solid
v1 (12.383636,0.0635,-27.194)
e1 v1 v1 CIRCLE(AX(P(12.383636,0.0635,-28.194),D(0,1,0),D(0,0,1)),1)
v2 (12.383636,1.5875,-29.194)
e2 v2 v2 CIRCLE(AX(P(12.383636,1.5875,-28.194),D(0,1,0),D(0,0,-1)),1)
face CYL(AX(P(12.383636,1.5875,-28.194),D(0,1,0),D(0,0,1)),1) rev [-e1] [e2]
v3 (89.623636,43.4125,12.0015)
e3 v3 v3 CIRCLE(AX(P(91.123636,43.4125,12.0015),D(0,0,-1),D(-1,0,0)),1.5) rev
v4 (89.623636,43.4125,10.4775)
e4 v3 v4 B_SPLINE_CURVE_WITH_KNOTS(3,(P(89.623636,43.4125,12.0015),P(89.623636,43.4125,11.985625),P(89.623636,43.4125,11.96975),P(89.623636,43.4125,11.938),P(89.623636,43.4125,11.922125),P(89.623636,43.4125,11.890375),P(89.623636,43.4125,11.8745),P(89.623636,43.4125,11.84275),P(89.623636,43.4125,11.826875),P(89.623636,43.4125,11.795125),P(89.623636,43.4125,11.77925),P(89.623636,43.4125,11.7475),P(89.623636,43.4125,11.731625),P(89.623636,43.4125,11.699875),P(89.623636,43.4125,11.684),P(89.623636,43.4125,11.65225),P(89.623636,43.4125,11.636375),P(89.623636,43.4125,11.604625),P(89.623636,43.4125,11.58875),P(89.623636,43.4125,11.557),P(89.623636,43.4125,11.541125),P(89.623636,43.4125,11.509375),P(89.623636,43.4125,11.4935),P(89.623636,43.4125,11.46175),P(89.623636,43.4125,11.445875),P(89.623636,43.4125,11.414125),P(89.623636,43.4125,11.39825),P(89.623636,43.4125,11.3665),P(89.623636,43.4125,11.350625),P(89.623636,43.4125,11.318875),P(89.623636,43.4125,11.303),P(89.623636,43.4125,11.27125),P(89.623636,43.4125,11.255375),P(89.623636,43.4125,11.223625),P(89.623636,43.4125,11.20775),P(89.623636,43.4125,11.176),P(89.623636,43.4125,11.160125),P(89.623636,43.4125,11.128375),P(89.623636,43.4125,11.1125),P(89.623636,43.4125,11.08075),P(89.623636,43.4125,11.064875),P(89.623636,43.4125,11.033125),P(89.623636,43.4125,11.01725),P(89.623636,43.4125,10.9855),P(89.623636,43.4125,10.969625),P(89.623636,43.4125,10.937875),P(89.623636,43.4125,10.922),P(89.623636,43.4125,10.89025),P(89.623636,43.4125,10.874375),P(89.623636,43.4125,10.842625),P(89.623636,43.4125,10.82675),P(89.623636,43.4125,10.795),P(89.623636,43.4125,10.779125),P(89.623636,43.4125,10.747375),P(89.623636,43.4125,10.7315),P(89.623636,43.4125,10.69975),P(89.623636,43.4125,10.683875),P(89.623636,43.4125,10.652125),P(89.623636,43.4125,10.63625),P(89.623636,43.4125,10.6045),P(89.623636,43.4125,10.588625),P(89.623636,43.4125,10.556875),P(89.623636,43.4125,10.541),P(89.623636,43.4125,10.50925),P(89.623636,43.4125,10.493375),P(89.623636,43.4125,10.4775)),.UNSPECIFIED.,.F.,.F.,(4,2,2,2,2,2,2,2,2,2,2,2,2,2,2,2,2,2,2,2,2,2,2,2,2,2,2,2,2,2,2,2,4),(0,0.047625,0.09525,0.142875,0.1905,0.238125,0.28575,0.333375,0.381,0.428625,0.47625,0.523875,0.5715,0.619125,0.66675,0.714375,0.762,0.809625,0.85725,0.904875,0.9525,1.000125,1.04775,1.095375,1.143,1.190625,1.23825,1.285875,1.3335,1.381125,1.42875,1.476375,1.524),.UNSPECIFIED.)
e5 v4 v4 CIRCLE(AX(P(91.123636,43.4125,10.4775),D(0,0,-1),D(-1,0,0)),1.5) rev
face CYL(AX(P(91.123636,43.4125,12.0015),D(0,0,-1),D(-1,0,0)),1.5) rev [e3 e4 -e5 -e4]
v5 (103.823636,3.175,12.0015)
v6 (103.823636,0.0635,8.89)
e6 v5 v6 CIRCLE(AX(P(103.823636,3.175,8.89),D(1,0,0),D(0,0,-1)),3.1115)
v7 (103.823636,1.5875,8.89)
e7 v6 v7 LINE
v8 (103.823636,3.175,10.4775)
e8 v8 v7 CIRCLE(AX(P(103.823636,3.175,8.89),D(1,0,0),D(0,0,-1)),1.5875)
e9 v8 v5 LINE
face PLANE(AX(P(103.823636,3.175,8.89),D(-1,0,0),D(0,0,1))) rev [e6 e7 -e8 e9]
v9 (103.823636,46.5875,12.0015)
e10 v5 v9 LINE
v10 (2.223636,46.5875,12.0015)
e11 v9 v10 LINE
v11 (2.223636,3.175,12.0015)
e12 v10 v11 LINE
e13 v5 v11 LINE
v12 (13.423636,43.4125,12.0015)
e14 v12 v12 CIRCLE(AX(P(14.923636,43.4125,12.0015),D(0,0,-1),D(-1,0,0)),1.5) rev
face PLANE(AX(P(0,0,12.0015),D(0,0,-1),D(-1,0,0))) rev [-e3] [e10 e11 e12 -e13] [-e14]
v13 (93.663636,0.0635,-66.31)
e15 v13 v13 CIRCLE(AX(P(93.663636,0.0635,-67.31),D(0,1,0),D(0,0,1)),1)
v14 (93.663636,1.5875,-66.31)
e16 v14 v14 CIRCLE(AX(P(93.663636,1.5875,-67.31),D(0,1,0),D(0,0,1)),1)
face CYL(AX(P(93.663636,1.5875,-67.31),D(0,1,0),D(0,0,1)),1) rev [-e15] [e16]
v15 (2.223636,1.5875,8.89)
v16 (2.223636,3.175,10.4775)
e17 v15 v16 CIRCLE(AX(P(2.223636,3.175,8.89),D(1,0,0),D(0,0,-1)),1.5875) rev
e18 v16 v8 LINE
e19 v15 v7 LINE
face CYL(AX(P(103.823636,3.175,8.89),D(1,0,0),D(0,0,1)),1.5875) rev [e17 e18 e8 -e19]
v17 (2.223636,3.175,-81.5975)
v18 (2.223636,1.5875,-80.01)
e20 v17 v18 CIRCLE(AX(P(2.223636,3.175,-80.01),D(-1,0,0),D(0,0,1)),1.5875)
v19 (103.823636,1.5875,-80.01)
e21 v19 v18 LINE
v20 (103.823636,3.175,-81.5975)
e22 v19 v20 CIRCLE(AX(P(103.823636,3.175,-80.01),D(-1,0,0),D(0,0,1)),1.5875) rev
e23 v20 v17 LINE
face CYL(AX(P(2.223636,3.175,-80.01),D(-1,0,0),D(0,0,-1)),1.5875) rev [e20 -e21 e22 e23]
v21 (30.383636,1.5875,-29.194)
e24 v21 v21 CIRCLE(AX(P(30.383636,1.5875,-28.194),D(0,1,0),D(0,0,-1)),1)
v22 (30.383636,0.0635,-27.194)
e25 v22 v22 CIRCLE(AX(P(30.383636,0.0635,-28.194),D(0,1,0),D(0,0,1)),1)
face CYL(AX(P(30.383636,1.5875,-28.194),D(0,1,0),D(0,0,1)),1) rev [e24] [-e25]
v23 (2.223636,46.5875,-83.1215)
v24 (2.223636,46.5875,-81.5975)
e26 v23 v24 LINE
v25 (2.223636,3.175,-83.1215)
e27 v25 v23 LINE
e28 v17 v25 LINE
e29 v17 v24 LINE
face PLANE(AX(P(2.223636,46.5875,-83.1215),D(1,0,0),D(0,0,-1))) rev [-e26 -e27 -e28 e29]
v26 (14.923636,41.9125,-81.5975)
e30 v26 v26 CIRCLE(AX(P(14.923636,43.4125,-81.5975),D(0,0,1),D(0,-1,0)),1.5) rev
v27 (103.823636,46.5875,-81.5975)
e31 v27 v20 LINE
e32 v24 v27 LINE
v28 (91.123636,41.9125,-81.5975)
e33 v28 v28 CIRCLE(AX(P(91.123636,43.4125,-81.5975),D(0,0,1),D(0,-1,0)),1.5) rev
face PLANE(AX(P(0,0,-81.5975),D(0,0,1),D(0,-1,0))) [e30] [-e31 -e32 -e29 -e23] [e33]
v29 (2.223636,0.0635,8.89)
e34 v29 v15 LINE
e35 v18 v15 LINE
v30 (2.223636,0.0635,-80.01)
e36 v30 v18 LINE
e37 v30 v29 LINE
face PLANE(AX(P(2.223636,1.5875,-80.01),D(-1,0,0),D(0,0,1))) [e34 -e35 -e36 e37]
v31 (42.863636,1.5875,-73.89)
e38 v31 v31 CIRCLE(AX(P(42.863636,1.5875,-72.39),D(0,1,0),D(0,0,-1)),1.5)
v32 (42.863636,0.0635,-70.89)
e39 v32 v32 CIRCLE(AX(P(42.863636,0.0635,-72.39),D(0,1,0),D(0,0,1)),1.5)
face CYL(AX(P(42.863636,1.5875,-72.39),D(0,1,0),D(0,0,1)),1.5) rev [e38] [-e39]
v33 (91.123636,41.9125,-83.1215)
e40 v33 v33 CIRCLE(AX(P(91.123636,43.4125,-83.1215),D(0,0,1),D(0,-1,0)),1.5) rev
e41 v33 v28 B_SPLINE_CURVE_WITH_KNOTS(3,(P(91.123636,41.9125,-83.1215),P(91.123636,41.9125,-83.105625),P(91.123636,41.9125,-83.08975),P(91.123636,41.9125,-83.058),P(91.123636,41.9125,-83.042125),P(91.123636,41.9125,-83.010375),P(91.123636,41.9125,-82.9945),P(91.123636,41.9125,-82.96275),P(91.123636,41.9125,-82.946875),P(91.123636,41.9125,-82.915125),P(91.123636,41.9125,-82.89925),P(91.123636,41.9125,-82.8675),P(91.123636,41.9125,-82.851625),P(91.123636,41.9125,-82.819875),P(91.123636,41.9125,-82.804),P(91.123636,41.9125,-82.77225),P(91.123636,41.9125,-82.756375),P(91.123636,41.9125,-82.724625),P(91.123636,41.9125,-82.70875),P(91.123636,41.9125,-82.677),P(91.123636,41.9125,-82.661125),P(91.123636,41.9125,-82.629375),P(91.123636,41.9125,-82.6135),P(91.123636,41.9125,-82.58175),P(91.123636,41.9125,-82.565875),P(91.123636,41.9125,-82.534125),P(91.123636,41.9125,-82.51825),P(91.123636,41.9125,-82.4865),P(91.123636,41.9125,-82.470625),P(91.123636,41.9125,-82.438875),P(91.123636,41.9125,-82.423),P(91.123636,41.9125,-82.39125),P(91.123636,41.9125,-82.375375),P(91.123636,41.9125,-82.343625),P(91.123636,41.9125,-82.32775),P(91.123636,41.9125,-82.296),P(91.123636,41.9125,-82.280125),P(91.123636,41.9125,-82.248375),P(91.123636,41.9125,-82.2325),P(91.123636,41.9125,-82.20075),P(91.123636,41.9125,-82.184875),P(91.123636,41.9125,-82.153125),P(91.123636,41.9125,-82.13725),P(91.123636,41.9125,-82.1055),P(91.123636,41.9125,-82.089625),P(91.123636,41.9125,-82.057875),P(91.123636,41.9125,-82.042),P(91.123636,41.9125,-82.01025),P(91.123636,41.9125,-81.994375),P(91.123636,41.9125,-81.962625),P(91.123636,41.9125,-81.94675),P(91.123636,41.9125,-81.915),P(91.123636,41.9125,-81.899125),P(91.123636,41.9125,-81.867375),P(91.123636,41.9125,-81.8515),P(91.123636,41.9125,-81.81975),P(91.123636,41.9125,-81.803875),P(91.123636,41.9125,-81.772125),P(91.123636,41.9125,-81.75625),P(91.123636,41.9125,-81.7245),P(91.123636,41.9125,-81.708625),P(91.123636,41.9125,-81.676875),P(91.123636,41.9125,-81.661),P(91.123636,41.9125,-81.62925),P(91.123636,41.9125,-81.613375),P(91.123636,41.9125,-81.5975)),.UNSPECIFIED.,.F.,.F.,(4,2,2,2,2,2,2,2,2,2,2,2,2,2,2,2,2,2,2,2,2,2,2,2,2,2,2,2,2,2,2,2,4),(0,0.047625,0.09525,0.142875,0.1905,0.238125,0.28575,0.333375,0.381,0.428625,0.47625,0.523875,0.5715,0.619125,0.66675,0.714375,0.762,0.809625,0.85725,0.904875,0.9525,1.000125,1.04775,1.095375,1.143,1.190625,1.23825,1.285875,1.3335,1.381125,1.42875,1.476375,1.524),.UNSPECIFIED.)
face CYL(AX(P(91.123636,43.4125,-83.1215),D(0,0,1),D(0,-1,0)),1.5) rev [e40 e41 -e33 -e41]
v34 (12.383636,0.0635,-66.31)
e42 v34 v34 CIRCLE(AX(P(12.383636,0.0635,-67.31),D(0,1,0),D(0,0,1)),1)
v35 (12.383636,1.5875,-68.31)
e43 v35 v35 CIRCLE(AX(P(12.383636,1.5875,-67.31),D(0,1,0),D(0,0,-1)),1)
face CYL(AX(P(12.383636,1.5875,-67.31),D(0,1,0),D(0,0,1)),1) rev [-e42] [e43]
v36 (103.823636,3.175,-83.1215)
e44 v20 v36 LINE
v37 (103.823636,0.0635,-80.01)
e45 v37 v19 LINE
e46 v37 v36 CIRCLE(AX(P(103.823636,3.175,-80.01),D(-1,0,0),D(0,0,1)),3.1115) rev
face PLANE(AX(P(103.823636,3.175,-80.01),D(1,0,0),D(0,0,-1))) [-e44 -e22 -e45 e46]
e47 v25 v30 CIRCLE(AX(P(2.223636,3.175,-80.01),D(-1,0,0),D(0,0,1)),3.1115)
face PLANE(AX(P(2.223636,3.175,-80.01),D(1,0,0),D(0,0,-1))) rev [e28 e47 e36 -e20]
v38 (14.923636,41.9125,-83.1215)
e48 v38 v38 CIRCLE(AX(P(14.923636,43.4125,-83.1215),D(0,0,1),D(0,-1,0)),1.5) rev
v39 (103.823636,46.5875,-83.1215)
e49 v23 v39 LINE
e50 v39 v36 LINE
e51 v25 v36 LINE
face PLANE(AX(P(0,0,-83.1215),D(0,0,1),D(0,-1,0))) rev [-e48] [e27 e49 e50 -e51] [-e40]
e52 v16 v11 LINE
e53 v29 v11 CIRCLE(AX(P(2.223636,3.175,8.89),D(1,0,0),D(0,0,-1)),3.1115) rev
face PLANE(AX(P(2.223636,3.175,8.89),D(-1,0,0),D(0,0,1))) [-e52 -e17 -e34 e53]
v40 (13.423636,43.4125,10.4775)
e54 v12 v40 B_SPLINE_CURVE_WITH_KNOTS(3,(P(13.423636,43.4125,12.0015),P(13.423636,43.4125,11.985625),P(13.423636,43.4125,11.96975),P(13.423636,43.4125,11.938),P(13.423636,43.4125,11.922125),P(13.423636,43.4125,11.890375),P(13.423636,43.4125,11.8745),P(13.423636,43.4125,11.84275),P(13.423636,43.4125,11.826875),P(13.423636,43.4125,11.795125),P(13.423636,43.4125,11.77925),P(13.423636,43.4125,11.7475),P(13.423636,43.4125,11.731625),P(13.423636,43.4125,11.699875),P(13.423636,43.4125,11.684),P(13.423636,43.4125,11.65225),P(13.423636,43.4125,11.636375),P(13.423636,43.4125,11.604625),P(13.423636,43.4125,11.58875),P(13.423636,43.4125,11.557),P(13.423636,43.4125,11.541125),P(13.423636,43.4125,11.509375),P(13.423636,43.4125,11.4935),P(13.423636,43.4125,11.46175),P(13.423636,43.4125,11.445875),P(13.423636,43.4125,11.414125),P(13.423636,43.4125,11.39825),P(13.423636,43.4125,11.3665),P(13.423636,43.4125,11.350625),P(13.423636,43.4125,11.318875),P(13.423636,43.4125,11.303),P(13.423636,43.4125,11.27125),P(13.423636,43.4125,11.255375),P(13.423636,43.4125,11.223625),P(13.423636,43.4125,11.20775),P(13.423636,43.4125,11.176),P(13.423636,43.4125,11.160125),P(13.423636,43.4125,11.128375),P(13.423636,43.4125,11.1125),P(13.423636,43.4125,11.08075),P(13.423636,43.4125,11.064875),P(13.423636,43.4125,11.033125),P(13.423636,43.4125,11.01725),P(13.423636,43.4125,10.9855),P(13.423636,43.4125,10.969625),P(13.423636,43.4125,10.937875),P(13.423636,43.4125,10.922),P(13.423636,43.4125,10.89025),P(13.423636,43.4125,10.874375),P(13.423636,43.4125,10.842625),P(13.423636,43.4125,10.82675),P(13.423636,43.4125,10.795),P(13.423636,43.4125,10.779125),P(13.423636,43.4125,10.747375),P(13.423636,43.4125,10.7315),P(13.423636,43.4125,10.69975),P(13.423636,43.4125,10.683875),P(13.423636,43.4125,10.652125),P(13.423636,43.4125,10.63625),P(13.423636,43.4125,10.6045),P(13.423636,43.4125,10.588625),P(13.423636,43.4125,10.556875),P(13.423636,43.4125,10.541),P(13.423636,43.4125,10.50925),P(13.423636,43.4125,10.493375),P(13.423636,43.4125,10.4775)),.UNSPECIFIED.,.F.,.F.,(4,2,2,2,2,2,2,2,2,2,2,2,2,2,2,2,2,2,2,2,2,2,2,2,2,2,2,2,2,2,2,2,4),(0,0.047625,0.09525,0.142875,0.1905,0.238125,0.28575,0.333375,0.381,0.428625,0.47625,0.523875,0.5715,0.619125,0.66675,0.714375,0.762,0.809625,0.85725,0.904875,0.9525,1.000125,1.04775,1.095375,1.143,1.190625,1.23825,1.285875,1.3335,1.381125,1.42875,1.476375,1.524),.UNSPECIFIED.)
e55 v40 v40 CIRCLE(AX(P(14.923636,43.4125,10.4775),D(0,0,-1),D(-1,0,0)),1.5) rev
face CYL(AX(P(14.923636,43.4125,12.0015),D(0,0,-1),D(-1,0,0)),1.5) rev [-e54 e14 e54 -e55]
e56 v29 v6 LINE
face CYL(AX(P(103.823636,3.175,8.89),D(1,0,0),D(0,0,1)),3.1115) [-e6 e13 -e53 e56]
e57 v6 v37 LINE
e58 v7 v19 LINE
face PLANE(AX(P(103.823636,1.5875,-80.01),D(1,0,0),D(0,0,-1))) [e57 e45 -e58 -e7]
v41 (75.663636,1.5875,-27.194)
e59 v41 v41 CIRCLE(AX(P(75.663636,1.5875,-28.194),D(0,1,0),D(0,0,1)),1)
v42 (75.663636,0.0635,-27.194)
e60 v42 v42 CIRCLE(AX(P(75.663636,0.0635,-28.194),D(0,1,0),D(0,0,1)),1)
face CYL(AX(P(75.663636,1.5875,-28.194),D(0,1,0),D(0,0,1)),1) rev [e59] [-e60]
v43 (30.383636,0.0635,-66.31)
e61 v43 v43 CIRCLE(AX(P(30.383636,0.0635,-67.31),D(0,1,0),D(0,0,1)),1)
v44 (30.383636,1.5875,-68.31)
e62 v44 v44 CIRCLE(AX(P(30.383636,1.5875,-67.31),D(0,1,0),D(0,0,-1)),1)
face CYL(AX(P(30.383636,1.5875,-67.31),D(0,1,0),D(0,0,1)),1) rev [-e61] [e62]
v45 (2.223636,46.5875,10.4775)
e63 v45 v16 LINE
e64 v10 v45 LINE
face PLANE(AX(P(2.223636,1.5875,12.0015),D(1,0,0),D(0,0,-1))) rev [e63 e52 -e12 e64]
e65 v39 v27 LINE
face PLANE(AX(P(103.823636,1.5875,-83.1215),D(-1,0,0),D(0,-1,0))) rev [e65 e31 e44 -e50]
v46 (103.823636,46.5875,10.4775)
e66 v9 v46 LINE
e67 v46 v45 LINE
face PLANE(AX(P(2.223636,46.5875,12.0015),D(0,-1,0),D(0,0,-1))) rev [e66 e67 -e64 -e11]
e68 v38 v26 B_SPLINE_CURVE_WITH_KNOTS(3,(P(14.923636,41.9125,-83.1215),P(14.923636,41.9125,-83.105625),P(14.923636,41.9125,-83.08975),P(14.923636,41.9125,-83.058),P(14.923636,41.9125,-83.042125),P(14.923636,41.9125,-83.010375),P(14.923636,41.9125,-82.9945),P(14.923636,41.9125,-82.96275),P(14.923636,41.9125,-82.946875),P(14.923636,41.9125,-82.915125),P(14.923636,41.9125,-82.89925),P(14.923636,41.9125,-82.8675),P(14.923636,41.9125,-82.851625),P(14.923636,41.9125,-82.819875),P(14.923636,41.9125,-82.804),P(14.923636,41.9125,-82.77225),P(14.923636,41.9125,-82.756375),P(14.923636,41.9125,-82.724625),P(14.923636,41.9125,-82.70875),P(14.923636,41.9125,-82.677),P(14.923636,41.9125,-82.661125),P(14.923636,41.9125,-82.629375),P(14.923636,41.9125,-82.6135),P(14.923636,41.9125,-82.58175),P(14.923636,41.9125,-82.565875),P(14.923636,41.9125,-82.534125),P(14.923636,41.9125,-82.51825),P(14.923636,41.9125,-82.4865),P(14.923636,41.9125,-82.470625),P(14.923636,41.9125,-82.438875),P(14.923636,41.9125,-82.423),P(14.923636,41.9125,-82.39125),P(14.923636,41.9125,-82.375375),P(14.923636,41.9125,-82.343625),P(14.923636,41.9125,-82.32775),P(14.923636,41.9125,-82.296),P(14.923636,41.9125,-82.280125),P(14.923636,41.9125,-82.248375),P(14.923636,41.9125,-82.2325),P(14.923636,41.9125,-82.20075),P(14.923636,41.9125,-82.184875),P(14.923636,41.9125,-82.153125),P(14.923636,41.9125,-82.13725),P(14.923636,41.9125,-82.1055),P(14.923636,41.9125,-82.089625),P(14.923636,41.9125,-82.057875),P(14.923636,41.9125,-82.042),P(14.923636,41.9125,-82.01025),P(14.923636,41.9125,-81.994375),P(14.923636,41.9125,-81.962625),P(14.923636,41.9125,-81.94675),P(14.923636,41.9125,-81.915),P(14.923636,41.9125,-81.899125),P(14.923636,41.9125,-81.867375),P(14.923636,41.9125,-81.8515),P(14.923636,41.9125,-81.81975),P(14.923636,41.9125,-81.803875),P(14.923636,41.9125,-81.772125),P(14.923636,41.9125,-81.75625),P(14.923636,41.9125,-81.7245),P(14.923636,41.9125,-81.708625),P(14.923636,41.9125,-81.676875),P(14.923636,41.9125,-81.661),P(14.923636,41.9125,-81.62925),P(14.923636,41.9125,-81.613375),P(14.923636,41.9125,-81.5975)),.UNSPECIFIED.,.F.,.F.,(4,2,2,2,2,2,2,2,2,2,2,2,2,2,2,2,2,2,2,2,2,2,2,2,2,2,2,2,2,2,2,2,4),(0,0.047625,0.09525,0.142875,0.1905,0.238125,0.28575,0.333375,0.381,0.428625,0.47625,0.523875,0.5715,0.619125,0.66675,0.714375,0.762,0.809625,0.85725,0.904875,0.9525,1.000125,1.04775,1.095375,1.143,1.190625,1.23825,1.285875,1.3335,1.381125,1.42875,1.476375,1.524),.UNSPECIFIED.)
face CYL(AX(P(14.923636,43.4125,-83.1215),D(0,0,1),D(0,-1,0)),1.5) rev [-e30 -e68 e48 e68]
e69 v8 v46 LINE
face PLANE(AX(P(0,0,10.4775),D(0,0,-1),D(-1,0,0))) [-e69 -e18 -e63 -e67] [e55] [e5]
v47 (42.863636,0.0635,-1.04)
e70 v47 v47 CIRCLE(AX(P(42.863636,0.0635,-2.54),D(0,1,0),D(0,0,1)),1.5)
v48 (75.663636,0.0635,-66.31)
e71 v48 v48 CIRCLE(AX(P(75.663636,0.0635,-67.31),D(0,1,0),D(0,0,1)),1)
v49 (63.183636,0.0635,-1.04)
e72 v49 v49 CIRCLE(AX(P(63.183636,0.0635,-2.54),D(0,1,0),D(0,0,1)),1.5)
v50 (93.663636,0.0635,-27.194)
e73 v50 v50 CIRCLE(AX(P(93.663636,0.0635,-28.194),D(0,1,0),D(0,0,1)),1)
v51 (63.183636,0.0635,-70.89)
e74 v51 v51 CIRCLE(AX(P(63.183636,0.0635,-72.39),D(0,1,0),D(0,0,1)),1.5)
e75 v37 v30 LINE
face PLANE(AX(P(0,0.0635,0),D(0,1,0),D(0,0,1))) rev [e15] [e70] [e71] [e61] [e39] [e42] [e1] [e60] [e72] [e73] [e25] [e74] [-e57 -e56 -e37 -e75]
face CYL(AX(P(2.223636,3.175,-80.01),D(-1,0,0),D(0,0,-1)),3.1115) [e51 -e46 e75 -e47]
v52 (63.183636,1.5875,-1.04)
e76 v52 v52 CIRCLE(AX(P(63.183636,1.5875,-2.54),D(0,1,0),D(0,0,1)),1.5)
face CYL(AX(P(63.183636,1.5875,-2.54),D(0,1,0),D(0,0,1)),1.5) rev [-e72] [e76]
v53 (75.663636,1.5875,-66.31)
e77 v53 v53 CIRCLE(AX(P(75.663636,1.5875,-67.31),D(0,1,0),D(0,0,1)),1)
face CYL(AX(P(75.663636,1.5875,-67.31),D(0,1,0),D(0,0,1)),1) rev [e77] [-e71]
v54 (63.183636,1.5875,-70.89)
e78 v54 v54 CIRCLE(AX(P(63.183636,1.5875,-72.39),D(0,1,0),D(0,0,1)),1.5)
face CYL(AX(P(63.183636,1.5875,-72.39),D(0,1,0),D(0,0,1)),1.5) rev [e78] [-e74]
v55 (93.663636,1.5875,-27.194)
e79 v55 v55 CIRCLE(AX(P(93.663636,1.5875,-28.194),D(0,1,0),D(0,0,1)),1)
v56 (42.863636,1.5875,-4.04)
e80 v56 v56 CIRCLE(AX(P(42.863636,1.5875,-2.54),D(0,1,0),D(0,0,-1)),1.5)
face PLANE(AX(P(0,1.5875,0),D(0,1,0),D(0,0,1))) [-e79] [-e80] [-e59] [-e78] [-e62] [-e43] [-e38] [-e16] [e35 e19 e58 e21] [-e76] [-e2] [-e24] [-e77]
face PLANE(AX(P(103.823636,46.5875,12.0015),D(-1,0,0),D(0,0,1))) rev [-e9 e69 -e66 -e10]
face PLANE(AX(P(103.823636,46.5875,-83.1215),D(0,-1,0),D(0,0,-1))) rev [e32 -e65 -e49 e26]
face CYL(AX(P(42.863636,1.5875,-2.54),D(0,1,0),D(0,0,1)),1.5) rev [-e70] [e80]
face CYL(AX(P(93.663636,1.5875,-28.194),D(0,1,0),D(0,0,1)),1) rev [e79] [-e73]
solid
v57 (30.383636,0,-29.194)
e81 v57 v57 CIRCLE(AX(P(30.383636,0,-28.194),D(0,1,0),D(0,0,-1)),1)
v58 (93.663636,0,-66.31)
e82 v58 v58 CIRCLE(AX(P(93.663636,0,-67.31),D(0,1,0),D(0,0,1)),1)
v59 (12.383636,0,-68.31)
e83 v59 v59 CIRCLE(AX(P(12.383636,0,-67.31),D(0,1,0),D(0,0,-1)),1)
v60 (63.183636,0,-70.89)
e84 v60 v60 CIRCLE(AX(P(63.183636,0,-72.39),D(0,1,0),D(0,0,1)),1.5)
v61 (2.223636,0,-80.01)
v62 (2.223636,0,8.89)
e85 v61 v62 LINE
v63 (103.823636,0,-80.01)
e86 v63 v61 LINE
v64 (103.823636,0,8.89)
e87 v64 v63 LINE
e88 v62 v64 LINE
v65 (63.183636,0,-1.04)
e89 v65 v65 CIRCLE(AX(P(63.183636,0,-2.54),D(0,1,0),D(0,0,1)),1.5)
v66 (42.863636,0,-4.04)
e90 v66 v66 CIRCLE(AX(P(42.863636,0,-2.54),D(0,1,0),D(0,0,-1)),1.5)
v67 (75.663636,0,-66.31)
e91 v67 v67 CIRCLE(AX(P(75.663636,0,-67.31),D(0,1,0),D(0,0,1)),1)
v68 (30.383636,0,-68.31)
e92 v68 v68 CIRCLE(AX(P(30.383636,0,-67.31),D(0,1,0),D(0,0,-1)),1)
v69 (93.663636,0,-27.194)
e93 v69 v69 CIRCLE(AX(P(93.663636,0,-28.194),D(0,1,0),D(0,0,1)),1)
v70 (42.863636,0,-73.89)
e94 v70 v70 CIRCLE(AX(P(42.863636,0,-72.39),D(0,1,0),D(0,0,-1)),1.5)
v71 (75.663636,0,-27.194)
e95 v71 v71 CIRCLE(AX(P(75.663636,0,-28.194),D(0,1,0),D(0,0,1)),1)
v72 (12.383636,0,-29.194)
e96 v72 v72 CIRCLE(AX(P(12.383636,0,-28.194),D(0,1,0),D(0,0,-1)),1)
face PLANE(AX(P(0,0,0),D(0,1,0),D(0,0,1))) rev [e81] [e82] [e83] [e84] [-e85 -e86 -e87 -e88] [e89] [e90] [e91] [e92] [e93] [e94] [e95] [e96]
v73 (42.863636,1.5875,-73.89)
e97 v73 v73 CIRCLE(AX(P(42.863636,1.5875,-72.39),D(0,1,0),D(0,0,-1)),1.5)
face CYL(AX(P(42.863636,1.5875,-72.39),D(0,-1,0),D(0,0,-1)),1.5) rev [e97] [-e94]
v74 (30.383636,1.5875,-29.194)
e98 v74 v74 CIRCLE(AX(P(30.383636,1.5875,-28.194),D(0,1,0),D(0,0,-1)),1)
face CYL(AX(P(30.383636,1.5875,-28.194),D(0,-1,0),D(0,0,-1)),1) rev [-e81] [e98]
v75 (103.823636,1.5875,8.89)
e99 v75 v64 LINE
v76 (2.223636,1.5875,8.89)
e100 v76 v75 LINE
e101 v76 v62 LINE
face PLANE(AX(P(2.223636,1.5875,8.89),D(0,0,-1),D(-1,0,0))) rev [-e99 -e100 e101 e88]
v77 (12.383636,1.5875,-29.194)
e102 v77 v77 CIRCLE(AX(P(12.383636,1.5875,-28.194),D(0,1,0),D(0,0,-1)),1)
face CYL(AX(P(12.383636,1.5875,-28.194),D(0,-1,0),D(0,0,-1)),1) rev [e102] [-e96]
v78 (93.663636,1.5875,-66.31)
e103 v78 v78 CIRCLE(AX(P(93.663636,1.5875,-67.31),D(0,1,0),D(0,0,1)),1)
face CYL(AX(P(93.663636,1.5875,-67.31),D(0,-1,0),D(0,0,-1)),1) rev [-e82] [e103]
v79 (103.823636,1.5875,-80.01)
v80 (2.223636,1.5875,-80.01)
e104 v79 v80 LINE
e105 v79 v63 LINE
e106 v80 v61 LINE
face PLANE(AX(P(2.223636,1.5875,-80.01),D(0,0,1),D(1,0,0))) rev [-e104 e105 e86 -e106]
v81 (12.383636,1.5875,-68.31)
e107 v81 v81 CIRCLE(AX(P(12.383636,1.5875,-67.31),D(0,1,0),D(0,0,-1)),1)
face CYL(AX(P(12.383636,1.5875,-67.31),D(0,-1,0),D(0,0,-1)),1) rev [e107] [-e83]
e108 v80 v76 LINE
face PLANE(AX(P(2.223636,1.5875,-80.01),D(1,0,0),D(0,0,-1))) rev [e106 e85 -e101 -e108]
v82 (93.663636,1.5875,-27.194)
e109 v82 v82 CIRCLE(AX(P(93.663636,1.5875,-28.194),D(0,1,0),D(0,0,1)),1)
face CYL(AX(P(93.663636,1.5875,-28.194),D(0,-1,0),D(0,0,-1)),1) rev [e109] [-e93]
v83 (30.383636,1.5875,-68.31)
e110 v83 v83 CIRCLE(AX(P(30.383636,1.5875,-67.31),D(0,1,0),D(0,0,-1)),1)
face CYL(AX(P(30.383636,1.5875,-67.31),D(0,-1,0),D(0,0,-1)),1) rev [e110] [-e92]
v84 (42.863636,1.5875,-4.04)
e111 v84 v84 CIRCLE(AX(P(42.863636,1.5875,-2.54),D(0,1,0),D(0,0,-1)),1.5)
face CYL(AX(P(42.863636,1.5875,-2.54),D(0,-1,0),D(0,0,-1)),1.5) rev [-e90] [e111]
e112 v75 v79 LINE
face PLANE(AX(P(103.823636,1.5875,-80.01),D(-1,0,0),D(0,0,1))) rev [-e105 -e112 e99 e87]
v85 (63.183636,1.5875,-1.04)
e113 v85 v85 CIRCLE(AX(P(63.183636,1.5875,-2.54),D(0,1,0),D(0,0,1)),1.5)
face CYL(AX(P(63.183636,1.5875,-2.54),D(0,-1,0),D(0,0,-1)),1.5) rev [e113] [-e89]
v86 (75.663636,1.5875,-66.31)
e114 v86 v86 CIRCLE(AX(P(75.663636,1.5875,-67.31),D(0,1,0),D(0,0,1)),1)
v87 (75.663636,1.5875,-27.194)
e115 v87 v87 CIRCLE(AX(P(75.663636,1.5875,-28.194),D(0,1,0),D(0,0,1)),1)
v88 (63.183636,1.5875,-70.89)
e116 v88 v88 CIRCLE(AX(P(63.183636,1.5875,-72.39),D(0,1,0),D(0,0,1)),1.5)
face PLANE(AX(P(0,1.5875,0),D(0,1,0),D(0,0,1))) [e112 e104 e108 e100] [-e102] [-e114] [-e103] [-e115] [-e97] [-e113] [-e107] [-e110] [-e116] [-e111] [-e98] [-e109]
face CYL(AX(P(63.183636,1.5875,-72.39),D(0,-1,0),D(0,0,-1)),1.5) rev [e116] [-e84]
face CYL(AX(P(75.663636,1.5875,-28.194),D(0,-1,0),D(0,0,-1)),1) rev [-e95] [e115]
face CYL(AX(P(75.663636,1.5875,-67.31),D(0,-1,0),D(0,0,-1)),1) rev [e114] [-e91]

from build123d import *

# Parameters (mm, degrees)
ESQUISSE1_W                      = 101.6
ESQUISSE1_H                      = 88.9
ESQUISSE1_R                      = 1.5
ESQUISSE1_R_2                    = 1
BOSS_EXTRU_1_DEPTH               = 1.5875
CONVERTIR_VOLUME1_START          = 0.0635
CONVERTIR_VOLUME1_OUTLINE_W      = 101.6
CONVERTIR_VOLUME1_OUTLINE_H      = 88.9
CONVERTIR_VOLUME1_OUTLINE_R      = 1.5
CONVERTIR_VOLUME1_OUTLINE_R_2    = 1
CONVERTIR_VOLUME1_DEPTH          = 1.524
T_LE_PLI_E_SUR_AR_TE1_DEPTH      = 101.6
T_LE_START                       = 1.524
T_LE_PLI_E_SUR_AR_TE1_PROFILE_W  = 101.6
T_LE_PLI_E_SUR_AR_TE1_PROFILE_H  = 43.4125
T_LE_PLI_E_SUR_AR_TE1_PROFILE_R  = 1.5
T_LE_PLI_E_SUR_AR_TE1_FLAT_DEPTH = 1.524
T_LE_PLI_E_SUR_AR_TE2_DEPTH      = 101.6
T_LE_PLI_E_SUR_AR_TE2_PROFILE_W  = 101.6
T_LE_PLI_E_SUR_AR_TE2_PROFILE_H  = 43.4125
T_LE_PLI_E_SUR_AR_TE2_PROFILE_R  = 1.5
T_LE_PLI_E_SUR_AR_TE2_FLAT_DEPTH = 1.524


# Read off the part's stored shape, not the designer's step: Convertir-Volume1
# Sheet-metal steps are written as plain solids
with BuildPart() as part:
    # Esquisse1 → Boss.-Extru.1 (new body)
    with BuildSketch(Plane(origin=(0, 0, 0), x_dir=(1, 0, 0), z_dir=(0, 1, 0))):
        with Locations((53.023636364, 35.56)):
            Rectangle(ESQUISSE1_W, ESQUISSE1_H)
        with Locations(Location((63.183636364, 72.39, 0), (0, 0, 270))):
            Circle(ESQUISSE1_R, mode=Mode.SUBTRACT)
        with Locations(Location((63.183636364, 2.54, 0), (0, 0, 270))):
            Circle(ESQUISSE1_R, mode=Mode.SUBTRACT)
        with Locations(Location((75.663636364, 67.31, 0), (0, 0, 270))):
            Circle(ESQUISSE1_R_2, mode=Mode.SUBTRACT)
        with Locations(Location((93.663636364, 67.31, 0), (0, 0, 270))):
            Circle(ESQUISSE1_R_2, mode=Mode.SUBTRACT)
        with Locations(Location((93.663636364, 28.194, 0), (0, 0, 270))):
            Circle(ESQUISSE1_R_2, mode=Mode.SUBTRACT)
        with Locations(Location((75.663636364, 28.194, 0), (0, 0, 270))):
            Circle(ESQUISSE1_R_2, mode=Mode.SUBTRACT)
        with Locations(Location((42.863636364, 2.54, 0), (0, 0, 90))):
            Circle(ESQUISSE1_R, mode=Mode.SUBTRACT)
        with Locations(Location((12.383636364, 28.194, 0), (0, 0, 90))):
            Circle(ESQUISSE1_R_2, mode=Mode.SUBTRACT)
        with Locations(Location((30.383636364, 28.194, 0), (0, 0, 90))):
            Circle(ESQUISSE1_R_2, mode=Mode.SUBTRACT)
        with Locations(Location((12.383636364, 67.31, 0), (0, 0, 90))):
            Circle(ESQUISSE1_R_2, mode=Mode.SUBTRACT)
        with Locations(Location((30.383636364, 67.31, 0), (0, 0, 90))):
            Circle(ESQUISSE1_R_2, mode=Mode.SUBTRACT)
        with Locations(Location((42.863636364, 72.39, 0), (0, 0, 90))):
            Circle(ESQUISSE1_R, mode=Mode.SUBTRACT)
    extrude(amount=BOSS_EXTRU_1_DEPTH)


with BuildPart() as body_2:
    # Convertir-Volume1 outline → Convertir-Volume1 (new body)
    with BuildSketch(Plane(origin=(0, 0, 0), x_dir=(1, 0, 0), z_dir=(0, 1, 0)).offset(CONVERTIR_VOLUME1_START)):
        with Locations((53.023636364, 35.56)):
            Rectangle(CONVERTIR_VOLUME1_OUTLINE_W, CONVERTIR_VOLUME1_OUTLINE_H)
        with Locations((42.863636364, 2.54)):
            Circle(CONVERTIR_VOLUME1_OUTLINE_R, mode=Mode.SUBTRACT)
        with Locations((12.383636364, 28.194)):
            Circle(CONVERTIR_VOLUME1_OUTLINE_R_2, mode=Mode.SUBTRACT)
        with Locations((30.383636364, 28.194)):
            Circle(CONVERTIR_VOLUME1_OUTLINE_R_2, mode=Mode.SUBTRACT)
        with Locations((63.183636364, 2.54)):
            Circle(CONVERTIR_VOLUME1_OUTLINE_R, mode=Mode.SUBTRACT)
        with Locations((75.663636364, 28.194)):
            Circle(CONVERTIR_VOLUME1_OUTLINE_R_2, mode=Mode.SUBTRACT)
        with Locations((93.663636364, 28.194)):
            Circle(CONVERTIR_VOLUME1_OUTLINE_R_2, mode=Mode.SUBTRACT)
        with Locations((12.383636364, 67.31)):
            Circle(CONVERTIR_VOLUME1_OUTLINE_R_2, mode=Mode.SUBTRACT)
        with Locations((30.383636364, 67.31)):
            Circle(CONVERTIR_VOLUME1_OUTLINE_R_2, mode=Mode.SUBTRACT)
        with Locations((42.863636364, 72.39)):
            Circle(CONVERTIR_VOLUME1_OUTLINE_R, mode=Mode.SUBTRACT)
        with Locations((75.663636364, 67.31)):
            Circle(CONVERTIR_VOLUME1_OUTLINE_R_2, mode=Mode.SUBTRACT)
        with Locations((63.183636364, 72.39)):
            Circle(CONVERTIR_VOLUME1_OUTLINE_R, mode=Mode.SUBTRACT)
        with Locations((93.663636364, 67.31)):
            Circle(CONVERTIR_VOLUME1_OUTLINE_R_2, mode=Mode.SUBTRACT)
    extrude(amount=CONVERTIR_VOLUME1_DEPTH)

    # Tôle pliée sur arête1 bend section (across the edge) → Tôle pliée sur arête1 (add)
    with BuildSketch(Plane(origin=(2.223636364, 1.5875, 10.4775), x_dir=(0, 0, -1), z_dir=(1, 0, 0))):
        with BuildLine():
            Line((-1.524, 1.5875), (0, 1.5875))
            ThreePointArc((0, 1.5875), (0.464967985, 0.464967985), (1.5875, 0))
            Line((1.5875, 0), (1.5875, -1.524))
            ThreePointArc((1.5875, -1.524), (-0.61266275, -0.61266275), (-1.524, 1.5875))
        make_face()
    extrude(amount=T_LE_PLI_E_SUR_AR_TE1_DEPTH)

    # Tôle pliée sur arête1 profile (on flange) → Tôle pliée sur arête1 flat (add)
    with BuildSketch(Plane(origin=(0, 1.5875, 10.4775), x_dir=(1, 0, 0), z_dir=(0, 0, 1)).offset(T_LE_START)):
        with Locations((53.023636364, 23.29375)):
            Rectangle(T_LE_PLI_E_SUR_AR_TE1_PROFILE_W, T_LE_PLI_E_SUR_AR_TE1_PROFILE_H)
        with Locations((14.923636364, 41.825)):
            Circle(T_LE_PLI_E_SUR_AR_TE1_PROFILE_R, mode=Mode.SUBTRACT)
        with Locations((91.123636364, 41.825)):
            Circle(T_LE_PLI_E_SUR_AR_TE1_PROFILE_R, mode=Mode.SUBTRACT)
    extrude(amount=-T_LE_PLI_E_SUR_AR_TE1_FLAT_DEPTH)

    # Tôle pliée sur arête2 bend section (across the edge) → Tôle pliée sur arête2 (add)
    with BuildSketch(Plane(origin=(103.823636364, 1.5875, -81.5975), x_dir=(0, 0, 1), z_dir=(-1, 0, 0))):
        with BuildLine():
            Line((-1.524, 1.5875), (0, 1.5875))
            ThreePointArc((0, 1.5875), (0.464967985, 0.464967985), (1.5875, 0))
            Line((1.5875, 0), (1.5875, -1.524))
            ThreePointArc((1.5875, -1.524), (-0.61266275, -0.61266275), (-1.524, 1.5875))
        make_face()
    extrude(amount=T_LE_PLI_E_SUR_AR_TE2_DEPTH)

    # Tôle pliée sur arête2 profile (on flange) → Tôle pliée sur arête2 flat (add)
    with BuildSketch(Plane(origin=(0, 1.5875, -81.5975), x_dir=(-1, 0, 0), z_dir=(0, 0, -1)).offset(T_LE_START)):
        with Locations((-53.023636364, 23.29375)):
            Rectangle(T_LE_PLI_E_SUR_AR_TE2_PROFILE_W, T_LE_PLI_E_SUR_AR_TE2_PROFILE_H)
        with Locations((-14.923636364, 41.825)):
            Circle(T_LE_PLI_E_SUR_AR_TE2_PROFILE_R, mode=Mode.SUBTRACT)
        with Locations((-91.123636364, 41.825)):
            Circle(T_LE_PLI_E_SUR_AR_TE2_PROFILE_R, mode=Mode.SUBTRACT)
    extrude(amount=-T_LE_PLI_E_SUR_AR_TE2_FLAT_DEPTH)


solid = Compound([part.part, body_2.part])
